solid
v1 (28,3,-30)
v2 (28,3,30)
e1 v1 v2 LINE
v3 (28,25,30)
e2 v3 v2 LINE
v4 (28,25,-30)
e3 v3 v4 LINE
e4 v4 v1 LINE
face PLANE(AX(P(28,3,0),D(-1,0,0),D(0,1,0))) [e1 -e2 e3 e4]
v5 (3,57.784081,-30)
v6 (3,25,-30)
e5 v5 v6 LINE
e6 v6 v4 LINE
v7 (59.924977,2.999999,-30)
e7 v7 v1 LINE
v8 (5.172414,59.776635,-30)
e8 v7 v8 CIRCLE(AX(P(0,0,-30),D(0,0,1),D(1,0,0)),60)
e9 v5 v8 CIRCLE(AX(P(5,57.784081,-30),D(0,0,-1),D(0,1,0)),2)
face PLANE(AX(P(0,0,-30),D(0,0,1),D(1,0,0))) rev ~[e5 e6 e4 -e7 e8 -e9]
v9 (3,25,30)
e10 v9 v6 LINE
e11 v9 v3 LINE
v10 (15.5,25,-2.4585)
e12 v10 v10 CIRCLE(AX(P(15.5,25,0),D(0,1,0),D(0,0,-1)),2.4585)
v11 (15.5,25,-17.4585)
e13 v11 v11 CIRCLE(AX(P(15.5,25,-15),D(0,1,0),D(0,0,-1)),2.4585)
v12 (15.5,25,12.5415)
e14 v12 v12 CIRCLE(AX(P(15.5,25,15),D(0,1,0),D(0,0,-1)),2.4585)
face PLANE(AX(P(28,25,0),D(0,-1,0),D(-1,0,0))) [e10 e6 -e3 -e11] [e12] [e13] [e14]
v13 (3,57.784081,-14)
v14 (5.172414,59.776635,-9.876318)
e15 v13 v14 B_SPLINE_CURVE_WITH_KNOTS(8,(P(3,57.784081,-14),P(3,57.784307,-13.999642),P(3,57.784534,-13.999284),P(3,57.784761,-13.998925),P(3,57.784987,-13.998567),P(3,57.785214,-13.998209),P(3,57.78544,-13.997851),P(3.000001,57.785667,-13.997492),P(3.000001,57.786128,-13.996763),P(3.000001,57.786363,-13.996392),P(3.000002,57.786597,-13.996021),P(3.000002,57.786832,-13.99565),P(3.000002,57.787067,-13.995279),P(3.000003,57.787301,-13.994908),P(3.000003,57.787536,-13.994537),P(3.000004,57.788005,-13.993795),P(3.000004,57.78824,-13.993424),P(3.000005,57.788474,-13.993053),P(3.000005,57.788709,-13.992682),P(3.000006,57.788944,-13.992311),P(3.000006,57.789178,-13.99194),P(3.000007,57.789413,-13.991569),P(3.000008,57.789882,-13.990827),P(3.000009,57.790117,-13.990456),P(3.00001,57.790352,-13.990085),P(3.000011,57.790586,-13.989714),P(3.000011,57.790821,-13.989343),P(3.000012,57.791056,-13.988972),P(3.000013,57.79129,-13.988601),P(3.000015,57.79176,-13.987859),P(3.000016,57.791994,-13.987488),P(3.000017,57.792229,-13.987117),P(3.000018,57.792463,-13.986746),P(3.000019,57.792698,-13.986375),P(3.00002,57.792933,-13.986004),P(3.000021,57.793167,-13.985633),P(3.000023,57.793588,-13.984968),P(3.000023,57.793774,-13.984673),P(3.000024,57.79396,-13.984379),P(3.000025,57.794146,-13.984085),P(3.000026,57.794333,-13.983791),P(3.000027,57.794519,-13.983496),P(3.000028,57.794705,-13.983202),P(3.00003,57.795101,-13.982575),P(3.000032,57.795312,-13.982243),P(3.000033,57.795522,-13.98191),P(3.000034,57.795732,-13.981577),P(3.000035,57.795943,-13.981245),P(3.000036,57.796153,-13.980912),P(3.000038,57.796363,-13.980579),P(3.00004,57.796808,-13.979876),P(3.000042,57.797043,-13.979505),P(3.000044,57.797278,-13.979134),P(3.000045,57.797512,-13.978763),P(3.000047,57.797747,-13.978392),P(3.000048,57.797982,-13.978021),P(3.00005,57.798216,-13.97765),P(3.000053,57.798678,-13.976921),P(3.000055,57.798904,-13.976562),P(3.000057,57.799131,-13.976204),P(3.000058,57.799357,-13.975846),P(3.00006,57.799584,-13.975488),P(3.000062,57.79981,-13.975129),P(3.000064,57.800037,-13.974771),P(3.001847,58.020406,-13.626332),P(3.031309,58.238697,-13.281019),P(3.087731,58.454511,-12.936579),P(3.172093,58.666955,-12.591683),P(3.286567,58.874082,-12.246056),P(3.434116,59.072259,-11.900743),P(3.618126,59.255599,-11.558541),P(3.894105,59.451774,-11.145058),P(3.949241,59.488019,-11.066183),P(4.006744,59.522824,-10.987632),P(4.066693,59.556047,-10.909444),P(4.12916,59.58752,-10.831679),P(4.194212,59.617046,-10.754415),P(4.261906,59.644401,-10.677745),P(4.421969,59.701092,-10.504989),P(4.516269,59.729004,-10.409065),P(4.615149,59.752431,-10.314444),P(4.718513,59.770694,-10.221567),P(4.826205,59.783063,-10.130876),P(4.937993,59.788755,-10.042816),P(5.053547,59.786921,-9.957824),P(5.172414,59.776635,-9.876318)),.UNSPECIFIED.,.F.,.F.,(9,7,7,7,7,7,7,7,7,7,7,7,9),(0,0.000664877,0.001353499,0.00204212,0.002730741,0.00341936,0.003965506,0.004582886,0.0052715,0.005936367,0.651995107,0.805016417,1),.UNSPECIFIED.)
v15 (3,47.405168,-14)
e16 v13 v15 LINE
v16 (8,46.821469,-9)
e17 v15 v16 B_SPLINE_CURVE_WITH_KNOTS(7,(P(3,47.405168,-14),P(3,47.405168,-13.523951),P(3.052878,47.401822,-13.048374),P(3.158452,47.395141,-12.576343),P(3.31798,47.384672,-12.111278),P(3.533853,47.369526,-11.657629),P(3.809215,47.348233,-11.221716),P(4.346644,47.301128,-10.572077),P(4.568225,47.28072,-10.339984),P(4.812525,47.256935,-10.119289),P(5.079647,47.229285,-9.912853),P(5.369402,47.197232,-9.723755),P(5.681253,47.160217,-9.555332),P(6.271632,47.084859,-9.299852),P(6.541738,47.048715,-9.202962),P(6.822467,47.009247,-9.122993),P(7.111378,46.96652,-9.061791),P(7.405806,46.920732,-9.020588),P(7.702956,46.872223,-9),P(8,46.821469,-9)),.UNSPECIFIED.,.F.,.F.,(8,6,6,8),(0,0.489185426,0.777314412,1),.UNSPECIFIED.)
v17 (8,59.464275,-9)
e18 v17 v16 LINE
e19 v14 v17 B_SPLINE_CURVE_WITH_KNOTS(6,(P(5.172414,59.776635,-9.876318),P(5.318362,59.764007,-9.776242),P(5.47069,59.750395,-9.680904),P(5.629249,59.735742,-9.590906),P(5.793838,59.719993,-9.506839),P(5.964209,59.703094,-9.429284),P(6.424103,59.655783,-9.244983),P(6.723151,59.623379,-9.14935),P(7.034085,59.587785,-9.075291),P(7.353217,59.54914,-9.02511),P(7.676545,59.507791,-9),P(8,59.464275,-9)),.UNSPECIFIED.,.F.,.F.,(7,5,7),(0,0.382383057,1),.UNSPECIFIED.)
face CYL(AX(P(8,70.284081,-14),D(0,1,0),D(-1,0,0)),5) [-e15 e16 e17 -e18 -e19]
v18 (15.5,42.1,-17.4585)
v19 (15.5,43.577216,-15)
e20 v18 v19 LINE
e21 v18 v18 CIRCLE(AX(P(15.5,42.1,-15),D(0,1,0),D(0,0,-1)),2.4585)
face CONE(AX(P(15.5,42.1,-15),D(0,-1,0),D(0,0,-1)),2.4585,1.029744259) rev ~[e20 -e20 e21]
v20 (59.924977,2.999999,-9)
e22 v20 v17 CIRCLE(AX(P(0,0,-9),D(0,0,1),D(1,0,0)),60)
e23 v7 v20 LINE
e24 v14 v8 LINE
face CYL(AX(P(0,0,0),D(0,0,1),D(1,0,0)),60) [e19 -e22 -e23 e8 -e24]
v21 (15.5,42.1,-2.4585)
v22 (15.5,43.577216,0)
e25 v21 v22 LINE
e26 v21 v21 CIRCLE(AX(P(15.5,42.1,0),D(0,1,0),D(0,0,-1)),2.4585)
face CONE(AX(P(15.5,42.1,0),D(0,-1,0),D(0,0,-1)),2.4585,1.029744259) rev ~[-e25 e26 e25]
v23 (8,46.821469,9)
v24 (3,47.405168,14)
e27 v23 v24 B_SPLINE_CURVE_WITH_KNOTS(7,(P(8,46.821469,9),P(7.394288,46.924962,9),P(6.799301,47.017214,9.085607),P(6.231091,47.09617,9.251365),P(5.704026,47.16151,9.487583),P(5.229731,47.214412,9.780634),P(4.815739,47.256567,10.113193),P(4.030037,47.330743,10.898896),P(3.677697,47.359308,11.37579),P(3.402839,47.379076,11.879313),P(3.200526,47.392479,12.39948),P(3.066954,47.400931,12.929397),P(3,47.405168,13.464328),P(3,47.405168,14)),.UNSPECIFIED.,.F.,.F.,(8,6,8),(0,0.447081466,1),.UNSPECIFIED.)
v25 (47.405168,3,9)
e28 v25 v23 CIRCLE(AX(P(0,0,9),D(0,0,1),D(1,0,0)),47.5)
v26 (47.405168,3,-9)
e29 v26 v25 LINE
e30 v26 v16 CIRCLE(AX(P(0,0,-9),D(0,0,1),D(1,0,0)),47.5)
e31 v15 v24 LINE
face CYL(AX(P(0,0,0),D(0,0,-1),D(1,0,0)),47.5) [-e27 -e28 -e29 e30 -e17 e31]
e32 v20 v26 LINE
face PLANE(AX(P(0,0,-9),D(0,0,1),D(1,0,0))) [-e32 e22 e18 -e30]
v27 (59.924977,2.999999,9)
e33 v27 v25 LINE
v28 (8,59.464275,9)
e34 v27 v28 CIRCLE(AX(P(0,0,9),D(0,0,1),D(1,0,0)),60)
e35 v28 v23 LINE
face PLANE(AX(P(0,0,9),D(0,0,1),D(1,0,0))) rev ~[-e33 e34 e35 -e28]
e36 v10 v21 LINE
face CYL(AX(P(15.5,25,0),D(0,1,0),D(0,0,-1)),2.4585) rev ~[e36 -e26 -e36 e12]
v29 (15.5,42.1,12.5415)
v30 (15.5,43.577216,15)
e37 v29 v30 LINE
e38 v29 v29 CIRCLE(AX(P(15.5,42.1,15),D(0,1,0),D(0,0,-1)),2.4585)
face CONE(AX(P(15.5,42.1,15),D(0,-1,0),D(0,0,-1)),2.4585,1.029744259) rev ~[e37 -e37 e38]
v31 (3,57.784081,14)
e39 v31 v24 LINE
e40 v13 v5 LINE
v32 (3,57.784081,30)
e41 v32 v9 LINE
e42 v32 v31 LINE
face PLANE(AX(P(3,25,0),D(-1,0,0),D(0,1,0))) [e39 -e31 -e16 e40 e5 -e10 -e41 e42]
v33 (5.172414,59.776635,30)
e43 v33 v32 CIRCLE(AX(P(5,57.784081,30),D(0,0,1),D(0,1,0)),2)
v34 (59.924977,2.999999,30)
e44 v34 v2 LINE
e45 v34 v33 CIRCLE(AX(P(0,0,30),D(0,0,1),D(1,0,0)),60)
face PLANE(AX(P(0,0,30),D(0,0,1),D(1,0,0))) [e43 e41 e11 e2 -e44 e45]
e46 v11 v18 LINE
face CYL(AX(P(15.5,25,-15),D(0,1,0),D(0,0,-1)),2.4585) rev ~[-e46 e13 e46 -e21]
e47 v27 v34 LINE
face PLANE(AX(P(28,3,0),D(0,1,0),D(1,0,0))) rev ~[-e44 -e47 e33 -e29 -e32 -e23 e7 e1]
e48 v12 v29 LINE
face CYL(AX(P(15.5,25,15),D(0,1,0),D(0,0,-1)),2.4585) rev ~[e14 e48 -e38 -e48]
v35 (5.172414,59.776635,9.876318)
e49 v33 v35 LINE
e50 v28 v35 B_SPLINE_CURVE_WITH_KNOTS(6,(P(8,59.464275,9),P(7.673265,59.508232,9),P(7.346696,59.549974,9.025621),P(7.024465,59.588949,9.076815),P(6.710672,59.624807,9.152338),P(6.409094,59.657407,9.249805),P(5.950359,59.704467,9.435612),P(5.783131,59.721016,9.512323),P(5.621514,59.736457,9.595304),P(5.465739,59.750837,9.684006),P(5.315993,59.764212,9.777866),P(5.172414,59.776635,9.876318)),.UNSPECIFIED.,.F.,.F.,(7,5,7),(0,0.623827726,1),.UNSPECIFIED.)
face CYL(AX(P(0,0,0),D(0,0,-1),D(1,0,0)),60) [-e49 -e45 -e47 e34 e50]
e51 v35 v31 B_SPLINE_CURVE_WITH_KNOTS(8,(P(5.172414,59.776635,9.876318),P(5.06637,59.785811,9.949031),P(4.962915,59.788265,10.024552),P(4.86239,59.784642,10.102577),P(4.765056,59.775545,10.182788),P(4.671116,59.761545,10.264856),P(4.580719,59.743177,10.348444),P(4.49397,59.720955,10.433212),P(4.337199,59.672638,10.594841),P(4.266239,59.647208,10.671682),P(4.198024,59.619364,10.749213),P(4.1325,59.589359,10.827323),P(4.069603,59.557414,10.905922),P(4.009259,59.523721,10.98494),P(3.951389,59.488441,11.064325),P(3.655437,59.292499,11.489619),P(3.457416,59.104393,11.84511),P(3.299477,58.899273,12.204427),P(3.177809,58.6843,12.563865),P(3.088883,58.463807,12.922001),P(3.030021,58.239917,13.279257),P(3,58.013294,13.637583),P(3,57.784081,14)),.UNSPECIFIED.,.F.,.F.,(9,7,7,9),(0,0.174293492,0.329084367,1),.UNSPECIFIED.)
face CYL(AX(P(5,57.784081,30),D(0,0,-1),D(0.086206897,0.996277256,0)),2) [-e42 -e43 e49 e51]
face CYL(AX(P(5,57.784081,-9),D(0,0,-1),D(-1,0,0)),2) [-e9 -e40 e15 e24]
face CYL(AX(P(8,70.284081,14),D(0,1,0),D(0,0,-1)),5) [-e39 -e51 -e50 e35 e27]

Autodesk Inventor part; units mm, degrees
ref_plane "YZ Plane" through (0, 0, 0) normal (1, 0, 0) x (0, 1, 0)
ref_plane "XZ Plane" through (0, 0, 0) normal (0, 1, 0) x (-1, 0, 0)
sketch "Sketch15" plane through (0, 0, 0) normal (0, 0, 1) x (1, 0, 0)
  circle A0 centre (0, 0) radius 60
  dimension "d88" = 120
extrude "Extrusion7" add sketch "Sketch15" along normal mid plane 60
ref_plane "Work Plane1" through (0, 0, 0) normal (0, 0, 1) x (1, 0, 0)
sketch "Sketch16" plane through (0, 0, 0) normal (0, 0, 1) x (1, 0, 0)
  circle A0 centre (0, 0) radius 60 projected
  circle A1 centre (0, 0) radius 47.5
  dimension "d117" = 95
extrude "Extrusion8" cut sketch "Sketch16" along normal mid plane 18
sketch "Sketch17" plane through (0, 0, 0) normal (0, 0, 1) x (1, 0, 0)
  circle A0 centre (0, 0) radius 60 projected
  line L0 (3, 3) -> (59.925, 3)
  line L1 (3, 3) -> (3, 59.925)
  line L2 (28, 25) -> (0, 25)
  line L3 (0, 25) -> (0, 0)
  line L4 (0, 0) -> (28, 0)
  line L5 (28, 0) -> (28, 25)
  point P0 (28, 3)
  point P1 (3, 25)
  dimension "d118" = 3
  dimension "d119" = 3
  dimension "d120" = 22
  dimension "d121" = 25
extrude "Extrusion9" cut sketch "Sketch17" along normal through all both and the other way through all contours A0 L1 L2 L3 L4 L5 L0 | L5 L4 L3 L2 L1 L0 | L0 L1 L2 L5
sketch "Sketch19" plane through (3, 25, 30) normal (0, -1, 0) x (1, 0, 0)
  line L0 (0, -60) -> (0, 0) projected
  point P0 (-3, -30)
  point P1 (12.5, -15)
  point P2 (12.5, -45)
  point P3 (0, -30)
  point P4 (12.5, -30)
  point P5 (0, -30)
  dimension "d122" = 30
  dimension "d123" = 15
  dimension "d124" = 12.5
hole "Hole6" at (15.5, 25, 15) at (15.5, 25, -15) at (15.5, 25, 0) direction (0, 1, 0) diameter 4.917 depth 17.1 tip angle 118 thread size "M6x1" class "6H" standard "TS profile"
fillet "Fillet4" radius 2 2 edges at (3, 59.925, -19.5) (3, 59.925, 19.5)
fillet "Fillet5" radius 5 2 edges at (3, 52.5946, -9) (3, 52.5946, 9)
equation "\"d123\" = 0.5 * d122"
properties part number "TL20240901-10320CV-020" material "S45C"
